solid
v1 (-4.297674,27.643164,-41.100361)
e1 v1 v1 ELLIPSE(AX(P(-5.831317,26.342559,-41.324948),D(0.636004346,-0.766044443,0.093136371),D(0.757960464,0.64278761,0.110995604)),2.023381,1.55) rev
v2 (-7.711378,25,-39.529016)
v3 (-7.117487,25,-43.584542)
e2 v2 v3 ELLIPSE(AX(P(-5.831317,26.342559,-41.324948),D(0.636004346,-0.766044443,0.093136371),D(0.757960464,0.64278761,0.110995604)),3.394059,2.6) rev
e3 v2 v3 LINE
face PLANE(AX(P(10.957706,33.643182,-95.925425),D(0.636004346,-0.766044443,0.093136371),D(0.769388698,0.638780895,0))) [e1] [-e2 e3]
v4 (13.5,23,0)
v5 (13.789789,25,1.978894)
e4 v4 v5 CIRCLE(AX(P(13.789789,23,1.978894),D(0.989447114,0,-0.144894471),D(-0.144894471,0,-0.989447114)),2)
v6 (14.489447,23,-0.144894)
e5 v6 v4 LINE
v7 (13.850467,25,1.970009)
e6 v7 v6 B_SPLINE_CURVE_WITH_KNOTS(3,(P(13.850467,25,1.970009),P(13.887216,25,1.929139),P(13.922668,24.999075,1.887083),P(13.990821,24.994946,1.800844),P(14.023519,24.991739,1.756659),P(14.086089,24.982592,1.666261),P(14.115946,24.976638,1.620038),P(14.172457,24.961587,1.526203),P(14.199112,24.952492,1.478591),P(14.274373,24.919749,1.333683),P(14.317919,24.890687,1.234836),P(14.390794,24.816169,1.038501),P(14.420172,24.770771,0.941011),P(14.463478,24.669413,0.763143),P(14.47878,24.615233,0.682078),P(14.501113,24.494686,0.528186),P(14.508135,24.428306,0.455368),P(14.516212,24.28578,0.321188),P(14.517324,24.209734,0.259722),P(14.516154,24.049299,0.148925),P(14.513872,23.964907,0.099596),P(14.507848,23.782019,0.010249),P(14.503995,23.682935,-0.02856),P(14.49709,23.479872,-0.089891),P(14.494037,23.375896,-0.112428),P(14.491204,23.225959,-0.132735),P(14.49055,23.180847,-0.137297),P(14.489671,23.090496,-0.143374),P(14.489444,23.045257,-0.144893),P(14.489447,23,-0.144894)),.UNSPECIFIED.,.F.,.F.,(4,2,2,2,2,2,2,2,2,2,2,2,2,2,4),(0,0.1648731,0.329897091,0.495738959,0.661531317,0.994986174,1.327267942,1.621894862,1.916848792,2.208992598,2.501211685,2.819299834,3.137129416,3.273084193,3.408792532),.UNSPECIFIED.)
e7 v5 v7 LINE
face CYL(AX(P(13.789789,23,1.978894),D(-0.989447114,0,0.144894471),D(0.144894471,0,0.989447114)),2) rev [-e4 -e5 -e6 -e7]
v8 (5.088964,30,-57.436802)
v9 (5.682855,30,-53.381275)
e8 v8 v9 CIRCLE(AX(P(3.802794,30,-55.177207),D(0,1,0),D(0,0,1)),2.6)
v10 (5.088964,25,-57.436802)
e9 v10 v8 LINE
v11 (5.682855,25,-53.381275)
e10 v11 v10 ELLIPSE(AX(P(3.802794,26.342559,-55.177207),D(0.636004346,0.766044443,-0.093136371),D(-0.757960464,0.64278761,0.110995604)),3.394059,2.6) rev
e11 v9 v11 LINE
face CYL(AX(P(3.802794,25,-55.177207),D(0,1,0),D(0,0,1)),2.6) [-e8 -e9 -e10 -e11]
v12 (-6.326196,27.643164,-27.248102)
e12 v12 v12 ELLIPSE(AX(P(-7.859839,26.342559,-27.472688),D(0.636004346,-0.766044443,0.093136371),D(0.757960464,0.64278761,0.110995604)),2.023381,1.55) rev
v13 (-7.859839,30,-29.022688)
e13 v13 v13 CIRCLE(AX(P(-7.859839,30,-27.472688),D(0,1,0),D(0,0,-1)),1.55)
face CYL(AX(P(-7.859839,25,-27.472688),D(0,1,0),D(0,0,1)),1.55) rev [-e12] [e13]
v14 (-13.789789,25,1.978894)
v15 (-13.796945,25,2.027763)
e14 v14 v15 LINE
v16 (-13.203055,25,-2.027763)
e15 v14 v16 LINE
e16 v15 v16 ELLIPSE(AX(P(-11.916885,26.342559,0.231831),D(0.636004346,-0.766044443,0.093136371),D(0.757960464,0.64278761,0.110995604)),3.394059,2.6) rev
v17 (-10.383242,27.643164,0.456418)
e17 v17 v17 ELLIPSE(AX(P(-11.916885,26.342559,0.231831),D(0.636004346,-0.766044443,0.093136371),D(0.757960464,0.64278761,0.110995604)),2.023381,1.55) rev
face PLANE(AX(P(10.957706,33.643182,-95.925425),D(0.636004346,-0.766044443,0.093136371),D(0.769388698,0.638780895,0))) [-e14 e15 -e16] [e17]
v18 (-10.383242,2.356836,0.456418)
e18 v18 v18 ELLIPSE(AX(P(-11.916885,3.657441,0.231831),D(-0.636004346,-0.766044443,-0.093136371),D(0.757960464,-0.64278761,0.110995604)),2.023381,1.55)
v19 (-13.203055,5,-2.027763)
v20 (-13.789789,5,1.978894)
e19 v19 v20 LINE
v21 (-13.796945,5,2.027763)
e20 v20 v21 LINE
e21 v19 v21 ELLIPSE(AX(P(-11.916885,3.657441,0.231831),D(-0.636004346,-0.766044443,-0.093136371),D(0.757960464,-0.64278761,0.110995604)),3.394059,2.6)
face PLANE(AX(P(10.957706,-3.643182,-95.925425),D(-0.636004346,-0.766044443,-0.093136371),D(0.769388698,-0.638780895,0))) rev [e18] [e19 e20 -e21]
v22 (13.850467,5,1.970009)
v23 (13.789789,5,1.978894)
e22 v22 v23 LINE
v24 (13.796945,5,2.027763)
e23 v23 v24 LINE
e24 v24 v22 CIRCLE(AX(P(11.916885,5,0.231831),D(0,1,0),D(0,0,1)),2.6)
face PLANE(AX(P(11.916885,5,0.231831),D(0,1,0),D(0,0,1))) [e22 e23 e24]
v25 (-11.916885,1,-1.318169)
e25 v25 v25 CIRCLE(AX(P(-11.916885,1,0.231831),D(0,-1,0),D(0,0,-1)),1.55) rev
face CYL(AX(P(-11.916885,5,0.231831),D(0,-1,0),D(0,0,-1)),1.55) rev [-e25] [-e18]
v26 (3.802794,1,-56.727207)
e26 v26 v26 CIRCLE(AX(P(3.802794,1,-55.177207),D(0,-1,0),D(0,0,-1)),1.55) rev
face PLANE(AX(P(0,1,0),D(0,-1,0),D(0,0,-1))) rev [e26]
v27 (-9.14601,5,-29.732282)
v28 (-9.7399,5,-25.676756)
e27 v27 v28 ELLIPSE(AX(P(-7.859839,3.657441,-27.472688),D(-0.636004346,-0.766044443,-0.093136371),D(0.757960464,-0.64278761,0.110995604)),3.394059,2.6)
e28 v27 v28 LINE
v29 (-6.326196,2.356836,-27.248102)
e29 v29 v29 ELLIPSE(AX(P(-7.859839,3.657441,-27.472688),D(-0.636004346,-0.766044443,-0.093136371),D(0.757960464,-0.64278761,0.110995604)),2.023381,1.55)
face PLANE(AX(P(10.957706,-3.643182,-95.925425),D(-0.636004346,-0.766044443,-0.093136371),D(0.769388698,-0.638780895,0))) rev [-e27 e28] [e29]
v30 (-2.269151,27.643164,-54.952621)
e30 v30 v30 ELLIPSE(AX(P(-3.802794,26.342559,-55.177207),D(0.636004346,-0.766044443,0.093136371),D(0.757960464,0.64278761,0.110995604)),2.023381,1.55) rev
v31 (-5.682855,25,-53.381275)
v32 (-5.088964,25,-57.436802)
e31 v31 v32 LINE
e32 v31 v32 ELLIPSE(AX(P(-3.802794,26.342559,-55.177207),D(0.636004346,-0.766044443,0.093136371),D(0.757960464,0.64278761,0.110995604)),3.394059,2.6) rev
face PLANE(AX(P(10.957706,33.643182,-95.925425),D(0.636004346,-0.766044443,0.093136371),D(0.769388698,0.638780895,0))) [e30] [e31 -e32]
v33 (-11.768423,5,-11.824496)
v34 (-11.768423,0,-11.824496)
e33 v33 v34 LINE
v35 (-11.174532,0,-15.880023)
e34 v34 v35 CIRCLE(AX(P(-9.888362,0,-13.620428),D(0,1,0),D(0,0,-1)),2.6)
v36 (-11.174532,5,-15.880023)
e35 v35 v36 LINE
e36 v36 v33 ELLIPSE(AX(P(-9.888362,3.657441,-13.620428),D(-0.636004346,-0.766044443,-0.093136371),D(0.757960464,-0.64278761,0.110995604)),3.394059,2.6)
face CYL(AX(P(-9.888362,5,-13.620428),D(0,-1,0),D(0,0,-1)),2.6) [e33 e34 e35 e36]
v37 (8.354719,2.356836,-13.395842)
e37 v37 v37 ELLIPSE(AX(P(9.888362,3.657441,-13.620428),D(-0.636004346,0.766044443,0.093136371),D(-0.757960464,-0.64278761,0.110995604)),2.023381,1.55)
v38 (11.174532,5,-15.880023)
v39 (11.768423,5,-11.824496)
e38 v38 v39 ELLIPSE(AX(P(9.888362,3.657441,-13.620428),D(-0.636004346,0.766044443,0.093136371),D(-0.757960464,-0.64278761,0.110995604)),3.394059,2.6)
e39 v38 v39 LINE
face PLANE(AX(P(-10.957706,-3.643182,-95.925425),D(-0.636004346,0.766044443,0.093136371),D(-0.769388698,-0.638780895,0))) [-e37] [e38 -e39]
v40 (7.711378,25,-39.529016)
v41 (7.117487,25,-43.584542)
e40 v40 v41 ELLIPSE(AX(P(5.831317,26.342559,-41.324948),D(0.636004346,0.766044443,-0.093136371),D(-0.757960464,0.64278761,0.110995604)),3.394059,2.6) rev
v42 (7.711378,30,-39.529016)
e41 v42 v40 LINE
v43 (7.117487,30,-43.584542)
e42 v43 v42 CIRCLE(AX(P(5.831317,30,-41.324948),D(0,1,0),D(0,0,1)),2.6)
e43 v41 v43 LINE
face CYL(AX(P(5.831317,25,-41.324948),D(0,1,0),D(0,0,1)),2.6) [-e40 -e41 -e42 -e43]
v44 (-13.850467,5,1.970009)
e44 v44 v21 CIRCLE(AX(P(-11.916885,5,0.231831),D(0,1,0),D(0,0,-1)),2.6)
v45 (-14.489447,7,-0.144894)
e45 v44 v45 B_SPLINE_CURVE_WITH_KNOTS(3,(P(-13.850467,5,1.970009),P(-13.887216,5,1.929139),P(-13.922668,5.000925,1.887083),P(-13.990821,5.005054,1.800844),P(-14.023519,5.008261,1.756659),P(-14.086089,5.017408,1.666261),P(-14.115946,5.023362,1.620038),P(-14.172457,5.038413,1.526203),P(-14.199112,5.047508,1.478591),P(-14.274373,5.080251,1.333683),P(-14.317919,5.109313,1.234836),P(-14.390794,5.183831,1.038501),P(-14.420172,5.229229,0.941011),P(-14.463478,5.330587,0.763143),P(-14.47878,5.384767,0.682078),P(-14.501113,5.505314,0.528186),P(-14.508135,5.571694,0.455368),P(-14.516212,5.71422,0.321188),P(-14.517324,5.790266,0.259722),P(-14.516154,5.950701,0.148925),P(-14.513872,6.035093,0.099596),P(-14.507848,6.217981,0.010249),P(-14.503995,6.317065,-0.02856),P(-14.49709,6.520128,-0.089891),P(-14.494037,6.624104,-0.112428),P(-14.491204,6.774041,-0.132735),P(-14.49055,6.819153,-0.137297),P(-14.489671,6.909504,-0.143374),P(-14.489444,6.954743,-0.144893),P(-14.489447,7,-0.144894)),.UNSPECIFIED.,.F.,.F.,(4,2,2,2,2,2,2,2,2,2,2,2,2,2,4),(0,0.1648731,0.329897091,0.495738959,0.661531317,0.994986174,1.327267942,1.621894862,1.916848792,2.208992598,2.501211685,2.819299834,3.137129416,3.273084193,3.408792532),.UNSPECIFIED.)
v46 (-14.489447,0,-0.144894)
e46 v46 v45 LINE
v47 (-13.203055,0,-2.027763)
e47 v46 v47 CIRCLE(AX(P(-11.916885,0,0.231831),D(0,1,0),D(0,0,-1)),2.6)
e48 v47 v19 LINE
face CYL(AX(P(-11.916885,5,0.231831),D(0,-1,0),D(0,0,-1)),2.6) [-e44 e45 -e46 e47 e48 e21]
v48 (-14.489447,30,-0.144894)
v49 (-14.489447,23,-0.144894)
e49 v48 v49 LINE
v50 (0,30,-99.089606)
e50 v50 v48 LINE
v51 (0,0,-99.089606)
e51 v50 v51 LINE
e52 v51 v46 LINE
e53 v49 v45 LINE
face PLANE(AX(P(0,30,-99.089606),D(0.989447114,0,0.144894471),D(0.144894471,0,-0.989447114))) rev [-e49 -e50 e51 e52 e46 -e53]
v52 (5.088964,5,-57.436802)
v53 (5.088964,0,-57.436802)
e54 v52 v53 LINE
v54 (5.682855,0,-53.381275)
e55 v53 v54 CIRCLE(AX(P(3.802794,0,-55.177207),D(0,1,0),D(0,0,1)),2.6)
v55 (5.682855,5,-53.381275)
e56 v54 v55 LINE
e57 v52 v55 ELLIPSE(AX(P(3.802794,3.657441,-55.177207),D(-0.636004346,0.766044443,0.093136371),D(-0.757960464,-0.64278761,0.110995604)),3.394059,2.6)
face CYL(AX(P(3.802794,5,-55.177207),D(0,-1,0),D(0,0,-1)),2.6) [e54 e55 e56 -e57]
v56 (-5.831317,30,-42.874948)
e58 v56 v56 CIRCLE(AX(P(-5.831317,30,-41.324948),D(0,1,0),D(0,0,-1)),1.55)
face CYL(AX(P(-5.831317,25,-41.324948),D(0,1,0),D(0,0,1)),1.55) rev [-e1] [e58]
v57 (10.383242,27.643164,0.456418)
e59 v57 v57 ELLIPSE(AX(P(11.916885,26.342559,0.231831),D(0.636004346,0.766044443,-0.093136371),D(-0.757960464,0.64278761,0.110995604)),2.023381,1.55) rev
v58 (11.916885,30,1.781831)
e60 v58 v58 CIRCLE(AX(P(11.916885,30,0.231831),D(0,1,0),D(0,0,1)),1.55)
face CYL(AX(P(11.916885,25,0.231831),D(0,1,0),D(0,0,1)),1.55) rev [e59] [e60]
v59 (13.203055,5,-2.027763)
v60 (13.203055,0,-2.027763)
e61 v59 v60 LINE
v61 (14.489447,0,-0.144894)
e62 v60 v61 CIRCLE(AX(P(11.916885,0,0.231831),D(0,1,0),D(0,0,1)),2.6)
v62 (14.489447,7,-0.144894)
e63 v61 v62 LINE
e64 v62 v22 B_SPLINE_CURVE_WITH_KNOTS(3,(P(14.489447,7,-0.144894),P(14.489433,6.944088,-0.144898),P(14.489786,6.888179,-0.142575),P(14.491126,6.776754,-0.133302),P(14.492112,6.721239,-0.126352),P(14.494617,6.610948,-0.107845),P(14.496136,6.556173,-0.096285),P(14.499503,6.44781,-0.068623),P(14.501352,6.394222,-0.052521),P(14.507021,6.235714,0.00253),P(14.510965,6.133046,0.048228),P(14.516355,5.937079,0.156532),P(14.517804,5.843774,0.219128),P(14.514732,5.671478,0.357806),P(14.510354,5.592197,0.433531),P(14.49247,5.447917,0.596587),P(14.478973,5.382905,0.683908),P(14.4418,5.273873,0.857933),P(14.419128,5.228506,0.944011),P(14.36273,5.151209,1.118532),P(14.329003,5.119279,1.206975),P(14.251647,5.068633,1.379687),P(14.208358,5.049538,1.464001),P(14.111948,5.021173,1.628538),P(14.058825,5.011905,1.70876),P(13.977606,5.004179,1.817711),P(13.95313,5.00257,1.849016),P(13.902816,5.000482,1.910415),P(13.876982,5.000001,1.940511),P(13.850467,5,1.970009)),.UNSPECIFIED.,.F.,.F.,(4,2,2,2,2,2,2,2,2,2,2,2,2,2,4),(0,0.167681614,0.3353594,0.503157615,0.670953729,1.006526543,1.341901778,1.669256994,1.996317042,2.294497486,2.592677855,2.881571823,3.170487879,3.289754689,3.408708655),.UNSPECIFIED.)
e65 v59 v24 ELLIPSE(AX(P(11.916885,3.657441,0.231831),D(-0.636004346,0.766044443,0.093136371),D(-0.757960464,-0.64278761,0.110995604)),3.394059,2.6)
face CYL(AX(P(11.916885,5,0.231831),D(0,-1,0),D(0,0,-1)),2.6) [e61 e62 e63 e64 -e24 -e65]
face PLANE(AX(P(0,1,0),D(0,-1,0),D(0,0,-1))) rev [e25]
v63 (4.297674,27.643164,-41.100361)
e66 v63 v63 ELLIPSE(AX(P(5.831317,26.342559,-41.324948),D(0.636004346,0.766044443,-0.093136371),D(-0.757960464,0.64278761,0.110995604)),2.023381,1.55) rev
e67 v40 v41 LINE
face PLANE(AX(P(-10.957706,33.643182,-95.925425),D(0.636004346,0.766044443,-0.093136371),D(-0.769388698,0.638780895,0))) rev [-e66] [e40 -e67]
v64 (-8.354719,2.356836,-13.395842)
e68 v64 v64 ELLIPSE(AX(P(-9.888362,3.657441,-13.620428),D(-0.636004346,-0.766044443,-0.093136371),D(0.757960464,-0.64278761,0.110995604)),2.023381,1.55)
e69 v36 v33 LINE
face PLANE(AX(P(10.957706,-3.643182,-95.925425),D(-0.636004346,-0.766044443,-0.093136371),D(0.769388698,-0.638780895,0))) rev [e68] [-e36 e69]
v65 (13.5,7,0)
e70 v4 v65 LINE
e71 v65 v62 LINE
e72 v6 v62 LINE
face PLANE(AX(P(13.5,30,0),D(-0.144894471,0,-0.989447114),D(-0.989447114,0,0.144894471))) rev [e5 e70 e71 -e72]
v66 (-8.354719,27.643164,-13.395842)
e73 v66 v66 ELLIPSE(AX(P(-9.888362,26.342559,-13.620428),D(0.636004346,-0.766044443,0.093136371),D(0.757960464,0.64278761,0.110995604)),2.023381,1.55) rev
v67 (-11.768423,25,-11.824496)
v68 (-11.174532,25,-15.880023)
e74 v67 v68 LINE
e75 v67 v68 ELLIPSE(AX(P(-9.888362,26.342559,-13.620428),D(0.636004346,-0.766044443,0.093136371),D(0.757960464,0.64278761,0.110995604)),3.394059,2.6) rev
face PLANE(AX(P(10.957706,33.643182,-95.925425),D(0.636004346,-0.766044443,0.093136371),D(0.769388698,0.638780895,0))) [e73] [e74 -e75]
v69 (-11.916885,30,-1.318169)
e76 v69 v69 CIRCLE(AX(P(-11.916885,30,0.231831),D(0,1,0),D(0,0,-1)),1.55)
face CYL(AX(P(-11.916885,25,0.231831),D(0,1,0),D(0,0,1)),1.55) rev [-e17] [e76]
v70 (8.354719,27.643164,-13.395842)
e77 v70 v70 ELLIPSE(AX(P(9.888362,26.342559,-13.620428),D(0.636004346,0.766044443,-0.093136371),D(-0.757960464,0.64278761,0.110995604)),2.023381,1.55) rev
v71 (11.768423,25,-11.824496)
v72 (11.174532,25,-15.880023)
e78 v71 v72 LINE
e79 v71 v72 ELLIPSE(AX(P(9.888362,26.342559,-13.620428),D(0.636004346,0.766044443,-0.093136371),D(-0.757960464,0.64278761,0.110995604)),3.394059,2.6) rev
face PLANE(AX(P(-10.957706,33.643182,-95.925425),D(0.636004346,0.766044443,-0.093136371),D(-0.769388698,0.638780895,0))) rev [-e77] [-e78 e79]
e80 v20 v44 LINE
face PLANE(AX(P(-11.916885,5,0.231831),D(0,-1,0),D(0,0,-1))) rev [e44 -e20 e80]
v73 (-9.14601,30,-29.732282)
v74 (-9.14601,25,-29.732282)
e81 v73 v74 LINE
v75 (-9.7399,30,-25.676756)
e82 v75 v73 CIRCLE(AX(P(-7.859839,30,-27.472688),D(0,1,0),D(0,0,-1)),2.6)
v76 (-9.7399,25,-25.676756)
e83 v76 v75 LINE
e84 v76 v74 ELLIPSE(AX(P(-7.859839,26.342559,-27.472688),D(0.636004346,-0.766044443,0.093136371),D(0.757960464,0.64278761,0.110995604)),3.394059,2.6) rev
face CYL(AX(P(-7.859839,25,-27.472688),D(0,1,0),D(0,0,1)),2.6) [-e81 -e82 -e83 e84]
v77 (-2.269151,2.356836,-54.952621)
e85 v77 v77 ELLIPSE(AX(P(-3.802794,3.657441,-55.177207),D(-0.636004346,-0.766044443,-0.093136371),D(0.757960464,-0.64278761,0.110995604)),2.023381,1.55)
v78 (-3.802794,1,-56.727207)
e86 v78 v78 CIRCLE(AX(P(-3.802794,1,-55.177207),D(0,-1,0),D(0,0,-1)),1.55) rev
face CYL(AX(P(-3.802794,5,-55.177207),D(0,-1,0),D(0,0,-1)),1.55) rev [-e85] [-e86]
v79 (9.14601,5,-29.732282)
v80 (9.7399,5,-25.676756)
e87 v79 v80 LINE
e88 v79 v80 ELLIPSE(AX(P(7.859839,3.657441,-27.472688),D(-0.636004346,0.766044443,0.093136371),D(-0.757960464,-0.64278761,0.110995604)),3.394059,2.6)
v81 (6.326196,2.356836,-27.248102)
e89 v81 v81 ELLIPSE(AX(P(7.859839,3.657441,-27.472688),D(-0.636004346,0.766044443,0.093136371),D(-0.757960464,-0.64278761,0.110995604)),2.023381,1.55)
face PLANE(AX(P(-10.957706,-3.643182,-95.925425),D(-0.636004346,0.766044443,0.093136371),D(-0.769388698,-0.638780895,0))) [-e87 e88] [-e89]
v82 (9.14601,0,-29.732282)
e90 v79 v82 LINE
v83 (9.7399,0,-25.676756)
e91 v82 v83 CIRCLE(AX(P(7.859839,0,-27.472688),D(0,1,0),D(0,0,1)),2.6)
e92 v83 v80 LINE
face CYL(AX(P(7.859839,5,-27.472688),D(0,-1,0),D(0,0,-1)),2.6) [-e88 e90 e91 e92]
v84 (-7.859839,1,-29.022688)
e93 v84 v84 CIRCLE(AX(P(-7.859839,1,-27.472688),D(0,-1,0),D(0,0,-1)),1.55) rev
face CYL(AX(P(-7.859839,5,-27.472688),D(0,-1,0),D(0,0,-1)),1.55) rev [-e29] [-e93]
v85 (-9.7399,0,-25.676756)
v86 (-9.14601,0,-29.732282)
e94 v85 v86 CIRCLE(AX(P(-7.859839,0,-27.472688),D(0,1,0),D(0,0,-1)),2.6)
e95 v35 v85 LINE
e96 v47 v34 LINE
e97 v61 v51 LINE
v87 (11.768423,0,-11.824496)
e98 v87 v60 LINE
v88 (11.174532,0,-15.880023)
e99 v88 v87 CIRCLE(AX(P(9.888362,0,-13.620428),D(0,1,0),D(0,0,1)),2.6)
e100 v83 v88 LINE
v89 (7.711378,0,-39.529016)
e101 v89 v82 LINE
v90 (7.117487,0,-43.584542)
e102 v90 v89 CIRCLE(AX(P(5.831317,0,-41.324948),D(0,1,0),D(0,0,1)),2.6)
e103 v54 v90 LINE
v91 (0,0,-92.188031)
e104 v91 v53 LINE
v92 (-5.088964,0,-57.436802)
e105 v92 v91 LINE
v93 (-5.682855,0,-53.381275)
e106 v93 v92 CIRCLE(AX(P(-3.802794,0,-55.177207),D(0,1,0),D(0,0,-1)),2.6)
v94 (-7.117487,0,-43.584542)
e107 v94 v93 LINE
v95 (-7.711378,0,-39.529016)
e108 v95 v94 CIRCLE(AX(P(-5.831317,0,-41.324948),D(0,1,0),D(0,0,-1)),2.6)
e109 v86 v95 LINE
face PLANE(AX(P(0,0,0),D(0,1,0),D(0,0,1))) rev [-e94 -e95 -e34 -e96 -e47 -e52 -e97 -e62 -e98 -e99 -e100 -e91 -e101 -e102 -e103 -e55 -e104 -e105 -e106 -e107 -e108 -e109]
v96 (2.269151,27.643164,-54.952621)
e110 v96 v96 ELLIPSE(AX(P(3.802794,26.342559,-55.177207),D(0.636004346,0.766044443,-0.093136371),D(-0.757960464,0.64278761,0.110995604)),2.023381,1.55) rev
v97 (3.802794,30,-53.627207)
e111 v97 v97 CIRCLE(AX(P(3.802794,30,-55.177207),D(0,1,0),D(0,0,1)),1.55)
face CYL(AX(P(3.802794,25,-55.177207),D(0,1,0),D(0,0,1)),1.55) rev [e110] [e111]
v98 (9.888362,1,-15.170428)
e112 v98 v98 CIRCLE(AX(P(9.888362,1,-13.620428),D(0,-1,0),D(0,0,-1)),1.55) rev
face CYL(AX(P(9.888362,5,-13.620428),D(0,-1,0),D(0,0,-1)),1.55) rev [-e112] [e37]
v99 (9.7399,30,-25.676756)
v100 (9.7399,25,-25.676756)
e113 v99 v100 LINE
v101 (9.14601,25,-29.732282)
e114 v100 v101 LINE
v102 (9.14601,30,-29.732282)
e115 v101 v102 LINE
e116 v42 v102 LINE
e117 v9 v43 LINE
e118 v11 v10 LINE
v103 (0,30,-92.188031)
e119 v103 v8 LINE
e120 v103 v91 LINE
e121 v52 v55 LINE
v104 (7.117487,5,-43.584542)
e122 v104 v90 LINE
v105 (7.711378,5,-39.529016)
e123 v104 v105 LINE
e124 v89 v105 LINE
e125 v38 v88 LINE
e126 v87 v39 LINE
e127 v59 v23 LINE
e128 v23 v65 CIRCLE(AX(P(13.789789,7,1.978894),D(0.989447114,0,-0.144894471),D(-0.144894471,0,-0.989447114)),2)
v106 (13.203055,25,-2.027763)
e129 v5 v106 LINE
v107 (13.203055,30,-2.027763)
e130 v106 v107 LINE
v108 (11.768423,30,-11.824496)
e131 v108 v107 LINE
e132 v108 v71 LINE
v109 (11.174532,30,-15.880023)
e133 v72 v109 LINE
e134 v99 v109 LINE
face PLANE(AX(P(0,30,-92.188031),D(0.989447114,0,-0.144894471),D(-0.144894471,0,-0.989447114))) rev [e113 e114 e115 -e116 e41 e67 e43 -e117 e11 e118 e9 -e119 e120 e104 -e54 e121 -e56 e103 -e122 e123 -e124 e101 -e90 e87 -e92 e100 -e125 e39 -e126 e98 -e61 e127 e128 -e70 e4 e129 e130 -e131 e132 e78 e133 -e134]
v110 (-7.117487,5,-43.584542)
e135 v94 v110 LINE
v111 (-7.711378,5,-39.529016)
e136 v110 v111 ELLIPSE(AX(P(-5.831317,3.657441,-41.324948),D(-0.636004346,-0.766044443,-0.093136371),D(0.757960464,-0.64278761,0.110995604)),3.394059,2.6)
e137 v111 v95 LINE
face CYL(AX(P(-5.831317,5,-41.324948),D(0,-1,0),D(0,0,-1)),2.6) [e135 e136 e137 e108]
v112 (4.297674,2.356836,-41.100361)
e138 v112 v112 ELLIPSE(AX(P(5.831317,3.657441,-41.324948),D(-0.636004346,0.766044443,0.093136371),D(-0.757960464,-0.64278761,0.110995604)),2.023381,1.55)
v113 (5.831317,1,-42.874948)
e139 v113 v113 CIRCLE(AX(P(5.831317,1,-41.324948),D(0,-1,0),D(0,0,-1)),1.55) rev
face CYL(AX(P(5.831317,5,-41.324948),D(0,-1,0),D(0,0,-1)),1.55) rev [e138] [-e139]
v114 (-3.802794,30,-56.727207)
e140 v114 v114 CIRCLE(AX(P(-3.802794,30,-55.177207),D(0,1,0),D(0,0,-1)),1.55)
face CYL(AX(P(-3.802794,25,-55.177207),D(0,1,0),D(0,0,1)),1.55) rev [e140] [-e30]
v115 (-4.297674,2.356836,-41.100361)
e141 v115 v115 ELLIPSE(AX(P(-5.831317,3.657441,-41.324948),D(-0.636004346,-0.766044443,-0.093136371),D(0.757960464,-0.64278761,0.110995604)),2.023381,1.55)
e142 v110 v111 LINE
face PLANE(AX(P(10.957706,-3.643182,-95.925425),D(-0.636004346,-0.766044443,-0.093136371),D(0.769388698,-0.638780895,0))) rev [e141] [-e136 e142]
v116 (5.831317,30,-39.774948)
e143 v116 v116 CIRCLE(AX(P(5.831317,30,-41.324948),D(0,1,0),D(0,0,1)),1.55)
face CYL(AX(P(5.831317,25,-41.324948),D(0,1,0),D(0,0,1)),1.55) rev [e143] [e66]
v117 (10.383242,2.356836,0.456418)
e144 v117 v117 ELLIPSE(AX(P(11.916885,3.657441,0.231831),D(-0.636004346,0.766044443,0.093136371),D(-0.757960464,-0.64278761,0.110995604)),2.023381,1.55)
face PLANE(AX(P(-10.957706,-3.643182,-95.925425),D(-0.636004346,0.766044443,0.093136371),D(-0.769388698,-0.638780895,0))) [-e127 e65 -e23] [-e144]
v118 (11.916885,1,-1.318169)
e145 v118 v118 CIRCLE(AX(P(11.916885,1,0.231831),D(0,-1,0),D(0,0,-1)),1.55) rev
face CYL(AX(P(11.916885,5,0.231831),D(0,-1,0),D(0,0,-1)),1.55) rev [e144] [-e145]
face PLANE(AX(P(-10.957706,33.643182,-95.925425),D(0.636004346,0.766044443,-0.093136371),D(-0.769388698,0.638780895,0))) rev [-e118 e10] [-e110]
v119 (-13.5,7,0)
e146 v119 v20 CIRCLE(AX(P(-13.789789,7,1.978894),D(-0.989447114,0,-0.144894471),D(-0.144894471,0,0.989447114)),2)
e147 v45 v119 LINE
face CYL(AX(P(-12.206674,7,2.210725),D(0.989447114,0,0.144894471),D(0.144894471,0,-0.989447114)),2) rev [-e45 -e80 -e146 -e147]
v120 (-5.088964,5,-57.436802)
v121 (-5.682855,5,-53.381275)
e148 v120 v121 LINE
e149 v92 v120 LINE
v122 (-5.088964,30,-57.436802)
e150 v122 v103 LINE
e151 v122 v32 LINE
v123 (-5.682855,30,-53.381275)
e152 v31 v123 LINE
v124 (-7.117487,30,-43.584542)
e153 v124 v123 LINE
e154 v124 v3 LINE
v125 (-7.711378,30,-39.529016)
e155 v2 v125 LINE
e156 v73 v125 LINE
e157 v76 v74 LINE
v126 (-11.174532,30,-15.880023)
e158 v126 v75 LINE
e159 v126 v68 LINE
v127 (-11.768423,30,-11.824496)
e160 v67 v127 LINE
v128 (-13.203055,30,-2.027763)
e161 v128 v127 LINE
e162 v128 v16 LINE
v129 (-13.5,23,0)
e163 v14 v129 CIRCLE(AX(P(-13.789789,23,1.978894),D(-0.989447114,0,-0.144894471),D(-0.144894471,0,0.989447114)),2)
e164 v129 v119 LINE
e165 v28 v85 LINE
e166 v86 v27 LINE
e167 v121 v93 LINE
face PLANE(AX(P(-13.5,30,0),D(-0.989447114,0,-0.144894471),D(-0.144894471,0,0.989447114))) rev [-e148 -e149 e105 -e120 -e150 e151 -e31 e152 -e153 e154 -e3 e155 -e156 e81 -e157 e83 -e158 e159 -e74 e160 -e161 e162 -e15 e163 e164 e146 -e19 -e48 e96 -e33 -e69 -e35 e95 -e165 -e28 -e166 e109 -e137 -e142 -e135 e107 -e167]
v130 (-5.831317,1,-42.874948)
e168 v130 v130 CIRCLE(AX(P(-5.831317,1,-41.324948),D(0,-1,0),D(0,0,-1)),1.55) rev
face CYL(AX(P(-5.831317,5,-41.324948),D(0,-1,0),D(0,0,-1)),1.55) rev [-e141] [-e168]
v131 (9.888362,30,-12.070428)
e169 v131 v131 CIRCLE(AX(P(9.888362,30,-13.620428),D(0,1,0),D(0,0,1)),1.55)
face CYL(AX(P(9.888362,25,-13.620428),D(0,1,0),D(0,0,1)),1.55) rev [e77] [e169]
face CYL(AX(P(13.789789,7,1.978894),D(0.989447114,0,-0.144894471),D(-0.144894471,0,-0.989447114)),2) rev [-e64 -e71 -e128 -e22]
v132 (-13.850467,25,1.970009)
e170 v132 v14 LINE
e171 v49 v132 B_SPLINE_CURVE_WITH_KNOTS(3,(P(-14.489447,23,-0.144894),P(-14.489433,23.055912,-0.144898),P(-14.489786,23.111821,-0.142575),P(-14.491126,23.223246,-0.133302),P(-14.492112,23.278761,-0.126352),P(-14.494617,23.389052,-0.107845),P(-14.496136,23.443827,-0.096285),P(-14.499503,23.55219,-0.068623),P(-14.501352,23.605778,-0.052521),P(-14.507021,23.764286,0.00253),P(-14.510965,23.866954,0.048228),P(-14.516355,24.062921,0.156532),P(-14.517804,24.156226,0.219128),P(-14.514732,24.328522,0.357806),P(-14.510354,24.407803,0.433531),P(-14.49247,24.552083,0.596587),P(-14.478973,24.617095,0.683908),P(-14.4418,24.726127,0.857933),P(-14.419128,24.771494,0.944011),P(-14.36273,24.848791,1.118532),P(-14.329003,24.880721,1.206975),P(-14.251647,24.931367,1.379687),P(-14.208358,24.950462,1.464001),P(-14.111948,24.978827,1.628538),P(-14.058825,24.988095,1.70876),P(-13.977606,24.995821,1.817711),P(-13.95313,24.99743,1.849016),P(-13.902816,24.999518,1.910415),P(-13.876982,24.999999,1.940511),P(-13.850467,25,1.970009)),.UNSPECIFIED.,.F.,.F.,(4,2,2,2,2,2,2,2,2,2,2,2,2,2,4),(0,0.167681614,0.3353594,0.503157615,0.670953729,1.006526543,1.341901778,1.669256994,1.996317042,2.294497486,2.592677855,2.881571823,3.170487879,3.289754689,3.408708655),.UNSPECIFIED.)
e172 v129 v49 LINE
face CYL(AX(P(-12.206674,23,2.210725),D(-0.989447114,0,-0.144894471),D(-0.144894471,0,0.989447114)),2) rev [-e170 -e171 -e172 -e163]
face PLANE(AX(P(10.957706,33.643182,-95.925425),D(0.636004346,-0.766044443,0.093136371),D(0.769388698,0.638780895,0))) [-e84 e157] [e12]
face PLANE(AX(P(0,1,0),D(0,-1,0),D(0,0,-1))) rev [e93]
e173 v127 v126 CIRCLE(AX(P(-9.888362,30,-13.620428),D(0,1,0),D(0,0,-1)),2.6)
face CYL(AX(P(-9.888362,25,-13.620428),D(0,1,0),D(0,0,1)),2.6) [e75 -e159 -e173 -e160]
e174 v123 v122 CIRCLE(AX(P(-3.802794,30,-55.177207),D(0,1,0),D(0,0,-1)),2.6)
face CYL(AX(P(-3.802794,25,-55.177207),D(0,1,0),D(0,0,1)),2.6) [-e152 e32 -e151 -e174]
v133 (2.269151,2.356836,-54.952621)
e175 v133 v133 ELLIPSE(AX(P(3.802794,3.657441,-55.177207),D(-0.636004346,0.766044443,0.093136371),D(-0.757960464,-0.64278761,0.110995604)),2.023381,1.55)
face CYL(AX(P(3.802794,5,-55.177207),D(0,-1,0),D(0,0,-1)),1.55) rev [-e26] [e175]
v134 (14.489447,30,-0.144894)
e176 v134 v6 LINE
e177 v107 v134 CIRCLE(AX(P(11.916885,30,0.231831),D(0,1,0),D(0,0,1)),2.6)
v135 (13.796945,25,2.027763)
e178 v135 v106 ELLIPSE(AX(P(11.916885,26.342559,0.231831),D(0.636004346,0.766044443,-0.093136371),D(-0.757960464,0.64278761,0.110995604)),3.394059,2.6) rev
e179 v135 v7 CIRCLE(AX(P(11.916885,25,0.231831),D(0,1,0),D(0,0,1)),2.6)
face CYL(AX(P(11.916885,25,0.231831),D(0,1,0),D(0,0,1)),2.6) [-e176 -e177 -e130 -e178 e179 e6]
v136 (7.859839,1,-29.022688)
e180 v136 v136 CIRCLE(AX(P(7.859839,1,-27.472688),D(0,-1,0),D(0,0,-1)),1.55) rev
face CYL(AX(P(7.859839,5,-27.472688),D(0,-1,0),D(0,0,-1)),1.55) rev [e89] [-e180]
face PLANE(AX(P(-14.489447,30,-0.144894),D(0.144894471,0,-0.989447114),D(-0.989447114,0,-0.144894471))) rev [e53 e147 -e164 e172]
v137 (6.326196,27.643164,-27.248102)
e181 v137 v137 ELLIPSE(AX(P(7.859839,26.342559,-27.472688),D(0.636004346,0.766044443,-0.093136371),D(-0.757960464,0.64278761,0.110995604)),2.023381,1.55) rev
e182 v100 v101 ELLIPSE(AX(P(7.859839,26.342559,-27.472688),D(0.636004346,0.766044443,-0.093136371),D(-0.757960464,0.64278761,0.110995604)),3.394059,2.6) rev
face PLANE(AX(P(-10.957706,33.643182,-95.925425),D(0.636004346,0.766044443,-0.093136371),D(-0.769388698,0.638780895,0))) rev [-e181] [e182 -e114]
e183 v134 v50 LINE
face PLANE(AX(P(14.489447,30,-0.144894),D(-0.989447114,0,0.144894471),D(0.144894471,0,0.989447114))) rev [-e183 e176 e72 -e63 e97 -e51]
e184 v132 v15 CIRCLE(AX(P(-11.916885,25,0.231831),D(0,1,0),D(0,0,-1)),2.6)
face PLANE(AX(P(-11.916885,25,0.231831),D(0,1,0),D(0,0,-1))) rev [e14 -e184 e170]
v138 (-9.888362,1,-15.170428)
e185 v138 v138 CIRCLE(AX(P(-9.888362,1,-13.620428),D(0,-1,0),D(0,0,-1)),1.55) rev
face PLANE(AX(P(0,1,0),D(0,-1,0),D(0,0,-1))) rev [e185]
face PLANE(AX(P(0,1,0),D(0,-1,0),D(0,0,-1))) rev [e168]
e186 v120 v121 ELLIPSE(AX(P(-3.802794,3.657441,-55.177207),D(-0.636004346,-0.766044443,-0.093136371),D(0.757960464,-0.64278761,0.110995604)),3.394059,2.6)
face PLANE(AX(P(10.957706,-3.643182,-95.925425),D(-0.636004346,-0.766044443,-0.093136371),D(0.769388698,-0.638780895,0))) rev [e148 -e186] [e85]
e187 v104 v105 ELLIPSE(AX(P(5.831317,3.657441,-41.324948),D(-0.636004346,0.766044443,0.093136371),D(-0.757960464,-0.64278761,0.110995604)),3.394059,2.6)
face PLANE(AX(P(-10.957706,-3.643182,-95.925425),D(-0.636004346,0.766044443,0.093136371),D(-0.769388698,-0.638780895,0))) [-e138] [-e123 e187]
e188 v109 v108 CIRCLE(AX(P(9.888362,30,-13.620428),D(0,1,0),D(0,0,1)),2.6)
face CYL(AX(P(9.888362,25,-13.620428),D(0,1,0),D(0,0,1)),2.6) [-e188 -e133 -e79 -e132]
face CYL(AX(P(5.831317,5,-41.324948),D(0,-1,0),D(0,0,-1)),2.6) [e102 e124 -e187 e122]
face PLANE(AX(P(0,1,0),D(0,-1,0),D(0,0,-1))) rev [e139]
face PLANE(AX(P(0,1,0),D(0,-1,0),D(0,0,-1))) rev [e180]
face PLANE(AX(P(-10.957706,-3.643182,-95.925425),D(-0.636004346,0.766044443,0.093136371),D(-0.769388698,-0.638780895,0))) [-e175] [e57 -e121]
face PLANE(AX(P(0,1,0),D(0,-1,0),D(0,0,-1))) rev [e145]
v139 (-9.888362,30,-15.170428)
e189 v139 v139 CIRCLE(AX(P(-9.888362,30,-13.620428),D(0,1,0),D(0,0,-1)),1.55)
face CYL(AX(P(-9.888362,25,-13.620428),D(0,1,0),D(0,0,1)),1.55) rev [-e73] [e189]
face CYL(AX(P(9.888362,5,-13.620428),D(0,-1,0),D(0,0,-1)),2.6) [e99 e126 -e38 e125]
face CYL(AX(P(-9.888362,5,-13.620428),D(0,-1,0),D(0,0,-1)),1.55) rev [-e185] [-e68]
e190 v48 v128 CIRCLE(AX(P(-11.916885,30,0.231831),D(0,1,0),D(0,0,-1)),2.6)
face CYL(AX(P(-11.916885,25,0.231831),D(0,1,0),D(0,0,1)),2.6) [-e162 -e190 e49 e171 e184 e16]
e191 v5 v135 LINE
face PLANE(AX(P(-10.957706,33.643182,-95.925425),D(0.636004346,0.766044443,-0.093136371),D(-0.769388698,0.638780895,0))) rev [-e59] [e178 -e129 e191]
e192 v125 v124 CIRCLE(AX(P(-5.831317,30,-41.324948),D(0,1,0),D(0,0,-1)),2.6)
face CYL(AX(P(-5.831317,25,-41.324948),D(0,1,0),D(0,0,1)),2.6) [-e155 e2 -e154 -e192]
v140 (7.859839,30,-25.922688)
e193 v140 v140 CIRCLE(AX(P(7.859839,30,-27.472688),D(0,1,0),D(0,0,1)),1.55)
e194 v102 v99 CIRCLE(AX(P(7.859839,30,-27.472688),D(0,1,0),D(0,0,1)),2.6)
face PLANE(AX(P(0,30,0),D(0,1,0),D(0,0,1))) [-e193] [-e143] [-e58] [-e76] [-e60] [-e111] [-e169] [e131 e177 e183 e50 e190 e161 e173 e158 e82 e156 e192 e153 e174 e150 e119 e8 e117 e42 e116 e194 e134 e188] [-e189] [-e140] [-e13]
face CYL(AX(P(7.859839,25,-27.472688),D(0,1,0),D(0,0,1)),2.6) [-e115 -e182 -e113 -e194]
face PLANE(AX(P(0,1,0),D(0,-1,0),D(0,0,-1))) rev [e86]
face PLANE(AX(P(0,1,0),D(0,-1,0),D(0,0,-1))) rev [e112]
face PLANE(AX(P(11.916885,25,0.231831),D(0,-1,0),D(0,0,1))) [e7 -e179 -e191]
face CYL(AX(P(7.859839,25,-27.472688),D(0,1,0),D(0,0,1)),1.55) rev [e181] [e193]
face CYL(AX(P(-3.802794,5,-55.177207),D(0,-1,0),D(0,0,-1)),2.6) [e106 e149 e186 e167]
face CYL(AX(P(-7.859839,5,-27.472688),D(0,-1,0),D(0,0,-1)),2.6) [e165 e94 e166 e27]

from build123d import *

# Parameters (mm, degrees)
BOSS_EXTRUDE1_DEPTH            = 30
SKETCH2_R                      = 2.6
SKETCH2_R_2                    = 1.55
BOSS_EXTRUDE3_DEPTH            = 5
CUT_EXTRUDE1_REACH             = 108.419
CUT_EXTRUDE1_DIRECTION_2_DEPTH = 107.419489108
CUT_EXTRUDE2_REACH             = 108.419
CUT_EXTRUDE2_DIRECTION_2_DEPTH = 107.419489108
FILLET1_R                      = 2
SKETCH6_R                      = 1.55
BOSS_EXTRUDE4_DEPTH            = 1


with BuildPart() as part:
    # Sketch1 → Boss-Extrude1 (new body)
    with BuildSketch(Plane(origin=(0, 0, 0), x_dir=(1, 0, 0), z_dir=(0, 1, 0))):
        Polygon((-13.5, 0), (0, 92.188031325), (13.5, 0), (14.489447114, 0.144894471), (0, 99.089605913), (-14.489447114, 0.144894471), align=None)
    extrude(amount=BOSS_EXTRUDE1_DEPTH)

    # Sketch2 → Boss-Extrude3 (add)
    # profile 1 of 10: a face of its own
    with BuildSketch(Plane(origin=(0, 0, 0), x_dir=(1, 0, 0), z_dir=(0, 1, 0))):
        with Locations((11.916884617, -0.231831154)):
            Circle(SKETCH2_R)
        with Locations(Location((11.916884617, -0.231831154, 0), (0, 0, 270))):
            Circle(SKETCH2_R_2, mode=Mode.SUBTRACT)
    # profile 2 of 10: a face of its own
    with BuildSketch(Plane(origin=(0, 0, 0), x_dir=(1, 0, 0), z_dir=(0, 1, 0))):
        with Locations((9.888362021, 13.620428448)):
            Circle(SKETCH2_R)
        with Locations(Location((9.888362021, 13.620428448, 0), (0, 0, 270))):
            Circle(SKETCH2_R_2, mode=Mode.SUBTRACT)
    # profile 3 of 10: a face of its own
    with BuildSketch(Plane(origin=(0, 0, 0), x_dir=(1, 0, 0), z_dir=(0, 1, 0))):
        with Locations((7.859839425, 27.47268805)):
            Circle(SKETCH2_R)
        with Locations(Location((7.859839425, 27.47268805, 0), (0, 0, 270))):
            Circle(SKETCH2_R_2, mode=Mode.SUBTRACT)
    # profile 4 of 10: a face of its own
    with BuildSketch(Plane(origin=(0, 0, 0), x_dir=(1, 0, 0), z_dir=(0, 1, 0))):
        with Locations((5.831316829, 41.324947652)):
            Circle(SKETCH2_R)
        with Locations(Location((5.831316829, 41.324947652, 0), (0, 0, 270))):
            Circle(SKETCH2_R_2, mode=Mode.SUBTRACT)
    # profile 5 of 10: a face of its own
    with BuildSketch(Plane(origin=(0, 0, 0), x_dir=(1, 0, 0), z_dir=(0, 1, 0))):
        with Locations((3.802794233, 55.177207254)):
            Circle(SKETCH2_R)
        with Locations(Location((3.802794233, 55.177207254, 0), (0, 0, 270))):
            Circle(SKETCH2_R_2, mode=Mode.SUBTRACT)
    # profile 6 of 10: a face of its own
    with BuildSketch(Plane(origin=(0, 0, 0), x_dir=(1, 0, 0), z_dir=(0, 1, 0))):
        with Locations((-11.916884617, -0.231831154)):
            Circle(SKETCH2_R)
        with Locations(Location((-11.916884617, -0.231831154, 0), (0, 0, 90))):
            Circle(SKETCH2_R_2, mode=Mode.SUBTRACT)
    # profile 7 of 10: a face of its own
    with BuildSketch(Plane(origin=(0, 0, 0), x_dir=(1, 0, 0), z_dir=(0, 1, 0))):
        with Locations((-9.888362021, 13.620428448)):
            Circle(SKETCH2_R)
        with Locations(Location((-9.888362021, 13.620428448, 0), (0, 0, 90))):
            Circle(SKETCH2_R_2, mode=Mode.SUBTRACT)
    # profile 8 of 10: a face of its own
    with BuildSketch(Plane(origin=(0, 0, 0), x_dir=(1, 0, 0), z_dir=(0, 1, 0))):
        with Locations((-7.859839425, 27.47268805)):
            Circle(SKETCH2_R)
        with Locations(Location((-7.859839425, 27.47268805, 0), (0, 0, 90))):
            Circle(SKETCH2_R_2, mode=Mode.SUBTRACT)
    # profile 9 of 10: a face of its own
    with BuildSketch(Plane(origin=(0, 0, 0), x_dir=(1, 0, 0), z_dir=(0, 1, 0))):
        with Locations((-5.831316829, 41.324947652)):
            Circle(SKETCH2_R)
        with Locations(Location((-5.831316829, 41.324947652, 0), (0, 0, 90))):
            Circle(SKETCH2_R_2, mode=Mode.SUBTRACT)
    # profile 10 of 10: a face of its own
    with BuildSketch(Plane(origin=(0, 0, 0), x_dir=(1, 0, 0), z_dir=(0, 1, 0))):
        with Locations((-3.802794233, 55.177207254)):
            Circle(SKETCH2_R)
        with Locations(Location((-3.802794233, 55.177207254, 0), (0, 0, 90))):
            Circle(SKETCH2_R_2, mode=Mode.SUBTRACT)
    boss_extrude3 = extrude(amount=BOSS_EXTRUDE3_DEPTH)

    # Cut-Extrude1: up to this face of the body (flat: up to its plane)
    cut_extrude1_end = Plane(part.part.faces().sort_by_distance((-6.674060715, 15.426495801, -46.612585527))[0])
    # Sketch4 → Cut-Extrude1 (cut, up to the picked face)
    with BuildSketch(Plane(origin=(0.283424505, 0, 1.935433121), x_dir=(0.9894471144188783, 0, -0.14489447114419254), z_dir=(0.14489447114419252, 0, 0.9894471144188782)), mode=Mode.PRIVATE) as cut_extrude1_sk1:
        Polygon((13.357536045, 5), (9.157536045, 5), (9.157536045, 1.475781549), align=None)
    cut_extrude1_tool1 = split(extrude(cut_extrude1_sk1.sketch, amount=-CUT_EXTRUDE1_REACH, mode=Mode.PRIVATE), bisect_by=cut_extrude1_end, keep=Keep.BOTH, mode=Mode.PRIVATE)
    cut_extrude1 = cut_extrude1_tool1.solids().sort_by(Axis((10.729548, 3.825261, 0.405705), (-0.14489447114419252, 0, -0.9894471144188782)))[0]
    add(cut_extrude1, mode=Mode.SUBTRACT)

    # Sketch4 → Cut-Extrude1 direction 2 (cut)
    with BuildSketch(Plane(origin=(0.283424505, 0, 1.935433121), x_dir=(0.9894471144188783, 0, -0.14489447114419254), z_dir=(0.14489447114419252, 0, 0.9894471144188782))):
        Polygon((13.357536045, 5), (9.157536045, 5), (9.157536045, 1.475781549), align=None)
    cut_extrude1_direction_2 = extrude(amount=CUT_EXTRUDE1_DIRECTION_2_DEPTH, mode=Mode.SUBTRACT)

    # Cut-Extrude2: up to this face of the body (flat: up to its plane)
    cut_extrude2_end = Plane(part.part.faces().sort_by_distance((6.674060715, 15.426495801, -46.612585527))[0])
    # Sketch5 → Cut-Extrude2 (cut, up to the picked face)
    with BuildSketch(Plane(origin=(-0.283424505, 0, 1.935433121), x_dir=(0.9894471144188784, 0, 0.14489447114419146), z_dir=(-0.14489447114419146, 0, 0.9894471144188784)), mode=Mode.PRIVATE) as cut_extrude2_sk1:
        Polygon((-9.157536045, 5), (-9.157536045, 1.475781549), (-13.357536045, 5), align=None)
    cut_extrude2_tool1 = split(extrude(cut_extrude2_sk1.sketch, amount=-CUT_EXTRUDE2_REACH, mode=Mode.PRIVATE), bisect_by=cut_extrude2_end, keep=Keep.BOTH, mode=Mode.PRIVATE)
    cut_extrude2 = cut_extrude2_tool1.solids().sort_by(Axis((-10.729548, 3.825261, 0.405705), (0.14489447114419146, 0, -0.9894471144188784)))[0]
    add(cut_extrude2, mode=Mode.SUBTRACT)

    # Sketch5 → Cut-Extrude2 direction 2 (cut)
    with BuildSketch(Plane(origin=(-0.283424505, 0, 1.935433121), x_dir=(0.9894471144188784, 0, 0.14489447114419146), z_dir=(-0.14489447114419146, 0, 0.9894471144188784))):
        Polygon((-9.157536045, 5), (-9.157536045, 1.475781549), (-13.357536045, 5), align=None)
    cut_extrude2_direction_2 = extrude(amount=CUT_EXTRUDE2_DIRECTION_2_DEPTH, mode=Mode.SUBTRACT)

    # Mirror2: Boss-Extrude3, Cut-Extrude1, Cut-Extrude1 direction 2, Cut-Extrude2, Cut-Extrude2 direction 2 across plane
    add(boss_extrude3.mirror(Plane.ZX.offset(15)))
    add(cut_extrude1.mirror(Plane.ZX.offset(15)), mode=Mode.SUBTRACT)
    add(cut_extrude1_direction_2.mirror(Plane.ZX.offset(15)), mode=Mode.SUBTRACT)
    add(cut_extrude2.mirror(Plane.ZX.offset(15)), mode=Mode.SUBTRACT)
    add(cut_extrude2_direction_2.mirror(Plane.ZX.offset(15)), mode=Mode.SUBTRACT)

    # Fillet1
    # the kernel refuses this fillet: 2 mm, written as the material it adds along each edge
    with BuildSketch(Plane(origin=(13.5, 5, 0), x_dir=(0, 1, 0), z_dir=(0.9894471144188783, 0, -0.1448944711441925))) as fillet1_piece_1_section:
        with BuildLine():
            CenterArc((FILLET1_R, FILLET1_R), FILLET1_R, 180, 90)
            Line((0, FILLET1_R), (0, 0))
            Line((0, 0), (FILLET1_R, 0))
        make_face()
    fillet1_piece_1 = extrude(amount=6, mode=Mode.PRIVATE)
    fillet1_piece_1 = fillet1_piece_1 & Plane(origin=(11.916884617, 5.699977741, 0.231831154), x_dir=(1, 0, 0), z_dir=(0, -1, 0)) * Cylinder(2.6, 20, mode=Mode.PRIVATE)
    add(fillet1_piece_1)
    with BuildSketch(Plane(origin=(13.5, 25, 0), x_dir=(0, -1, 0), z_dir=(0.9894471144188783, 0, -0.1448944711441925))) as fillet1_piece_2_section:
        with BuildLine():
            CenterArc((FILLET1_R, -FILLET1_R), FILLET1_R, 90, 90)
            Line((0, -FILLET1_R), (0, 0))
            Line((0, 0), (FILLET1_R, 0))
        make_face()
    fillet1_piece_2 = extrude(amount=6, mode=Mode.PRIVATE)
    fillet1_piece_2 = fillet1_piece_2 & Plane(origin=(11.916884617, 24.30002226, 0.231831154), x_dir=(1, 0, 0), z_dir=(0, 1, 0)) * Cylinder(2.6, 20, mode=Mode.PRIVATE)
    add(fillet1_piece_2)
    with BuildSketch(Plane(origin=(-19.436682687, 25, -0.869366827), x_dir=(0, -1, 0), z_dir=(0.9894471144188784, 0, 0.1448944711441914))) as fillet1_piece_3_section:
        with BuildLine():
            CenterArc((FILLET1_R, -FILLET1_R), FILLET1_R, 90, 90)
            Line((0, -FILLET1_R), (0, 0))
            Line((0, 0), (FILLET1_R, 0))
        make_face()
    fillet1_piece_3 = extrude(amount=6, mode=Mode.PRIVATE)
    fillet1_piece_3 = fillet1_piece_3 & Plane(origin=(-11.916884617, 24.777637105, 0.231831154), x_dir=(1, 0, 0), z_dir=(0, 1, 0)) * Cylinder(2.6, 21, mode=Mode.PRIVATE)
    add(fillet1_piece_3)
    with BuildSketch(Plane(origin=(-19.436682687, 5, -0.869366827), x_dir=(-0.1448944711441914, 0, 0.9894471144188784), z_dir=(0.9894471144188784, 0, 0.1448944711441914))) as fillet1_piece_4_section:
        with BuildLine():
            CenterArc((FILLET1_R, -FILLET1_R), FILLET1_R, 90, 90)
            Line((0, -FILLET1_R), (0, 0))
            Line((0, 0), (FILLET1_R, 0))
        make_face()
    fillet1_piece_4 = extrude(amount=6, mode=Mode.PRIVATE)
    fillet1_piece_4 = fillet1_piece_4 & Plane(origin=(-11.916884617, 5.222362792, 0.231831154), x_dir=(1, 0, 0), z_dir=(0, -1, 0)) * Cylinder(2.6, 21, mode=Mode.PRIVATE)
    add(fillet1_piece_4)

    # Sketch6 → Boss-Extrude4 (add)
    with BuildSketch(Plane.XZ):
        with Locations(Location((3.802794233, -55.177207254, 0), (0, 0, 270))):
            Circle(SKETCH6_R)
        with Locations(Location((-3.802794233, -55.177207254, 0), (0, 0, 270))):
            Circle(SKETCH6_R)
        with Locations(Location((-5.831316829, -41.324947652, 0), (0, 0, 270))):
            Circle(SKETCH6_R)
        with Locations(Location((5.831316829, -41.324947652, 0), (0, 0, 270))):
            Circle(SKETCH6_R)
        with Locations(Location((7.859839425, -27.47268805, 0), (0, 0, 270))):
            Circle(SKETCH6_R)
        with Locations(Location((-7.859839425, -27.47268805, 0), (0, 0, 270))):
            Circle(SKETCH6_R)
        with Locations(Location((-9.888362021, -13.620428448, 0), (0, 0, 270))):
            Circle(SKETCH6_R)
        with Locations(Location((9.888362021, -13.620428448, 0), (0, 0, 270))):
            Circle(SKETCH6_R)
        with Locations(Location((11.916884617, 0.231831154, 0), (0, 0, 270))):
            Circle(SKETCH6_R)
        with Locations(Location((-11.916884617, 0.231831154, 0), (0, 0, 270))):
            Circle(SKETCH6_R)
    extrude(amount=-BOSS_EXTRUDE4_DEPTH)


solid = part.part
